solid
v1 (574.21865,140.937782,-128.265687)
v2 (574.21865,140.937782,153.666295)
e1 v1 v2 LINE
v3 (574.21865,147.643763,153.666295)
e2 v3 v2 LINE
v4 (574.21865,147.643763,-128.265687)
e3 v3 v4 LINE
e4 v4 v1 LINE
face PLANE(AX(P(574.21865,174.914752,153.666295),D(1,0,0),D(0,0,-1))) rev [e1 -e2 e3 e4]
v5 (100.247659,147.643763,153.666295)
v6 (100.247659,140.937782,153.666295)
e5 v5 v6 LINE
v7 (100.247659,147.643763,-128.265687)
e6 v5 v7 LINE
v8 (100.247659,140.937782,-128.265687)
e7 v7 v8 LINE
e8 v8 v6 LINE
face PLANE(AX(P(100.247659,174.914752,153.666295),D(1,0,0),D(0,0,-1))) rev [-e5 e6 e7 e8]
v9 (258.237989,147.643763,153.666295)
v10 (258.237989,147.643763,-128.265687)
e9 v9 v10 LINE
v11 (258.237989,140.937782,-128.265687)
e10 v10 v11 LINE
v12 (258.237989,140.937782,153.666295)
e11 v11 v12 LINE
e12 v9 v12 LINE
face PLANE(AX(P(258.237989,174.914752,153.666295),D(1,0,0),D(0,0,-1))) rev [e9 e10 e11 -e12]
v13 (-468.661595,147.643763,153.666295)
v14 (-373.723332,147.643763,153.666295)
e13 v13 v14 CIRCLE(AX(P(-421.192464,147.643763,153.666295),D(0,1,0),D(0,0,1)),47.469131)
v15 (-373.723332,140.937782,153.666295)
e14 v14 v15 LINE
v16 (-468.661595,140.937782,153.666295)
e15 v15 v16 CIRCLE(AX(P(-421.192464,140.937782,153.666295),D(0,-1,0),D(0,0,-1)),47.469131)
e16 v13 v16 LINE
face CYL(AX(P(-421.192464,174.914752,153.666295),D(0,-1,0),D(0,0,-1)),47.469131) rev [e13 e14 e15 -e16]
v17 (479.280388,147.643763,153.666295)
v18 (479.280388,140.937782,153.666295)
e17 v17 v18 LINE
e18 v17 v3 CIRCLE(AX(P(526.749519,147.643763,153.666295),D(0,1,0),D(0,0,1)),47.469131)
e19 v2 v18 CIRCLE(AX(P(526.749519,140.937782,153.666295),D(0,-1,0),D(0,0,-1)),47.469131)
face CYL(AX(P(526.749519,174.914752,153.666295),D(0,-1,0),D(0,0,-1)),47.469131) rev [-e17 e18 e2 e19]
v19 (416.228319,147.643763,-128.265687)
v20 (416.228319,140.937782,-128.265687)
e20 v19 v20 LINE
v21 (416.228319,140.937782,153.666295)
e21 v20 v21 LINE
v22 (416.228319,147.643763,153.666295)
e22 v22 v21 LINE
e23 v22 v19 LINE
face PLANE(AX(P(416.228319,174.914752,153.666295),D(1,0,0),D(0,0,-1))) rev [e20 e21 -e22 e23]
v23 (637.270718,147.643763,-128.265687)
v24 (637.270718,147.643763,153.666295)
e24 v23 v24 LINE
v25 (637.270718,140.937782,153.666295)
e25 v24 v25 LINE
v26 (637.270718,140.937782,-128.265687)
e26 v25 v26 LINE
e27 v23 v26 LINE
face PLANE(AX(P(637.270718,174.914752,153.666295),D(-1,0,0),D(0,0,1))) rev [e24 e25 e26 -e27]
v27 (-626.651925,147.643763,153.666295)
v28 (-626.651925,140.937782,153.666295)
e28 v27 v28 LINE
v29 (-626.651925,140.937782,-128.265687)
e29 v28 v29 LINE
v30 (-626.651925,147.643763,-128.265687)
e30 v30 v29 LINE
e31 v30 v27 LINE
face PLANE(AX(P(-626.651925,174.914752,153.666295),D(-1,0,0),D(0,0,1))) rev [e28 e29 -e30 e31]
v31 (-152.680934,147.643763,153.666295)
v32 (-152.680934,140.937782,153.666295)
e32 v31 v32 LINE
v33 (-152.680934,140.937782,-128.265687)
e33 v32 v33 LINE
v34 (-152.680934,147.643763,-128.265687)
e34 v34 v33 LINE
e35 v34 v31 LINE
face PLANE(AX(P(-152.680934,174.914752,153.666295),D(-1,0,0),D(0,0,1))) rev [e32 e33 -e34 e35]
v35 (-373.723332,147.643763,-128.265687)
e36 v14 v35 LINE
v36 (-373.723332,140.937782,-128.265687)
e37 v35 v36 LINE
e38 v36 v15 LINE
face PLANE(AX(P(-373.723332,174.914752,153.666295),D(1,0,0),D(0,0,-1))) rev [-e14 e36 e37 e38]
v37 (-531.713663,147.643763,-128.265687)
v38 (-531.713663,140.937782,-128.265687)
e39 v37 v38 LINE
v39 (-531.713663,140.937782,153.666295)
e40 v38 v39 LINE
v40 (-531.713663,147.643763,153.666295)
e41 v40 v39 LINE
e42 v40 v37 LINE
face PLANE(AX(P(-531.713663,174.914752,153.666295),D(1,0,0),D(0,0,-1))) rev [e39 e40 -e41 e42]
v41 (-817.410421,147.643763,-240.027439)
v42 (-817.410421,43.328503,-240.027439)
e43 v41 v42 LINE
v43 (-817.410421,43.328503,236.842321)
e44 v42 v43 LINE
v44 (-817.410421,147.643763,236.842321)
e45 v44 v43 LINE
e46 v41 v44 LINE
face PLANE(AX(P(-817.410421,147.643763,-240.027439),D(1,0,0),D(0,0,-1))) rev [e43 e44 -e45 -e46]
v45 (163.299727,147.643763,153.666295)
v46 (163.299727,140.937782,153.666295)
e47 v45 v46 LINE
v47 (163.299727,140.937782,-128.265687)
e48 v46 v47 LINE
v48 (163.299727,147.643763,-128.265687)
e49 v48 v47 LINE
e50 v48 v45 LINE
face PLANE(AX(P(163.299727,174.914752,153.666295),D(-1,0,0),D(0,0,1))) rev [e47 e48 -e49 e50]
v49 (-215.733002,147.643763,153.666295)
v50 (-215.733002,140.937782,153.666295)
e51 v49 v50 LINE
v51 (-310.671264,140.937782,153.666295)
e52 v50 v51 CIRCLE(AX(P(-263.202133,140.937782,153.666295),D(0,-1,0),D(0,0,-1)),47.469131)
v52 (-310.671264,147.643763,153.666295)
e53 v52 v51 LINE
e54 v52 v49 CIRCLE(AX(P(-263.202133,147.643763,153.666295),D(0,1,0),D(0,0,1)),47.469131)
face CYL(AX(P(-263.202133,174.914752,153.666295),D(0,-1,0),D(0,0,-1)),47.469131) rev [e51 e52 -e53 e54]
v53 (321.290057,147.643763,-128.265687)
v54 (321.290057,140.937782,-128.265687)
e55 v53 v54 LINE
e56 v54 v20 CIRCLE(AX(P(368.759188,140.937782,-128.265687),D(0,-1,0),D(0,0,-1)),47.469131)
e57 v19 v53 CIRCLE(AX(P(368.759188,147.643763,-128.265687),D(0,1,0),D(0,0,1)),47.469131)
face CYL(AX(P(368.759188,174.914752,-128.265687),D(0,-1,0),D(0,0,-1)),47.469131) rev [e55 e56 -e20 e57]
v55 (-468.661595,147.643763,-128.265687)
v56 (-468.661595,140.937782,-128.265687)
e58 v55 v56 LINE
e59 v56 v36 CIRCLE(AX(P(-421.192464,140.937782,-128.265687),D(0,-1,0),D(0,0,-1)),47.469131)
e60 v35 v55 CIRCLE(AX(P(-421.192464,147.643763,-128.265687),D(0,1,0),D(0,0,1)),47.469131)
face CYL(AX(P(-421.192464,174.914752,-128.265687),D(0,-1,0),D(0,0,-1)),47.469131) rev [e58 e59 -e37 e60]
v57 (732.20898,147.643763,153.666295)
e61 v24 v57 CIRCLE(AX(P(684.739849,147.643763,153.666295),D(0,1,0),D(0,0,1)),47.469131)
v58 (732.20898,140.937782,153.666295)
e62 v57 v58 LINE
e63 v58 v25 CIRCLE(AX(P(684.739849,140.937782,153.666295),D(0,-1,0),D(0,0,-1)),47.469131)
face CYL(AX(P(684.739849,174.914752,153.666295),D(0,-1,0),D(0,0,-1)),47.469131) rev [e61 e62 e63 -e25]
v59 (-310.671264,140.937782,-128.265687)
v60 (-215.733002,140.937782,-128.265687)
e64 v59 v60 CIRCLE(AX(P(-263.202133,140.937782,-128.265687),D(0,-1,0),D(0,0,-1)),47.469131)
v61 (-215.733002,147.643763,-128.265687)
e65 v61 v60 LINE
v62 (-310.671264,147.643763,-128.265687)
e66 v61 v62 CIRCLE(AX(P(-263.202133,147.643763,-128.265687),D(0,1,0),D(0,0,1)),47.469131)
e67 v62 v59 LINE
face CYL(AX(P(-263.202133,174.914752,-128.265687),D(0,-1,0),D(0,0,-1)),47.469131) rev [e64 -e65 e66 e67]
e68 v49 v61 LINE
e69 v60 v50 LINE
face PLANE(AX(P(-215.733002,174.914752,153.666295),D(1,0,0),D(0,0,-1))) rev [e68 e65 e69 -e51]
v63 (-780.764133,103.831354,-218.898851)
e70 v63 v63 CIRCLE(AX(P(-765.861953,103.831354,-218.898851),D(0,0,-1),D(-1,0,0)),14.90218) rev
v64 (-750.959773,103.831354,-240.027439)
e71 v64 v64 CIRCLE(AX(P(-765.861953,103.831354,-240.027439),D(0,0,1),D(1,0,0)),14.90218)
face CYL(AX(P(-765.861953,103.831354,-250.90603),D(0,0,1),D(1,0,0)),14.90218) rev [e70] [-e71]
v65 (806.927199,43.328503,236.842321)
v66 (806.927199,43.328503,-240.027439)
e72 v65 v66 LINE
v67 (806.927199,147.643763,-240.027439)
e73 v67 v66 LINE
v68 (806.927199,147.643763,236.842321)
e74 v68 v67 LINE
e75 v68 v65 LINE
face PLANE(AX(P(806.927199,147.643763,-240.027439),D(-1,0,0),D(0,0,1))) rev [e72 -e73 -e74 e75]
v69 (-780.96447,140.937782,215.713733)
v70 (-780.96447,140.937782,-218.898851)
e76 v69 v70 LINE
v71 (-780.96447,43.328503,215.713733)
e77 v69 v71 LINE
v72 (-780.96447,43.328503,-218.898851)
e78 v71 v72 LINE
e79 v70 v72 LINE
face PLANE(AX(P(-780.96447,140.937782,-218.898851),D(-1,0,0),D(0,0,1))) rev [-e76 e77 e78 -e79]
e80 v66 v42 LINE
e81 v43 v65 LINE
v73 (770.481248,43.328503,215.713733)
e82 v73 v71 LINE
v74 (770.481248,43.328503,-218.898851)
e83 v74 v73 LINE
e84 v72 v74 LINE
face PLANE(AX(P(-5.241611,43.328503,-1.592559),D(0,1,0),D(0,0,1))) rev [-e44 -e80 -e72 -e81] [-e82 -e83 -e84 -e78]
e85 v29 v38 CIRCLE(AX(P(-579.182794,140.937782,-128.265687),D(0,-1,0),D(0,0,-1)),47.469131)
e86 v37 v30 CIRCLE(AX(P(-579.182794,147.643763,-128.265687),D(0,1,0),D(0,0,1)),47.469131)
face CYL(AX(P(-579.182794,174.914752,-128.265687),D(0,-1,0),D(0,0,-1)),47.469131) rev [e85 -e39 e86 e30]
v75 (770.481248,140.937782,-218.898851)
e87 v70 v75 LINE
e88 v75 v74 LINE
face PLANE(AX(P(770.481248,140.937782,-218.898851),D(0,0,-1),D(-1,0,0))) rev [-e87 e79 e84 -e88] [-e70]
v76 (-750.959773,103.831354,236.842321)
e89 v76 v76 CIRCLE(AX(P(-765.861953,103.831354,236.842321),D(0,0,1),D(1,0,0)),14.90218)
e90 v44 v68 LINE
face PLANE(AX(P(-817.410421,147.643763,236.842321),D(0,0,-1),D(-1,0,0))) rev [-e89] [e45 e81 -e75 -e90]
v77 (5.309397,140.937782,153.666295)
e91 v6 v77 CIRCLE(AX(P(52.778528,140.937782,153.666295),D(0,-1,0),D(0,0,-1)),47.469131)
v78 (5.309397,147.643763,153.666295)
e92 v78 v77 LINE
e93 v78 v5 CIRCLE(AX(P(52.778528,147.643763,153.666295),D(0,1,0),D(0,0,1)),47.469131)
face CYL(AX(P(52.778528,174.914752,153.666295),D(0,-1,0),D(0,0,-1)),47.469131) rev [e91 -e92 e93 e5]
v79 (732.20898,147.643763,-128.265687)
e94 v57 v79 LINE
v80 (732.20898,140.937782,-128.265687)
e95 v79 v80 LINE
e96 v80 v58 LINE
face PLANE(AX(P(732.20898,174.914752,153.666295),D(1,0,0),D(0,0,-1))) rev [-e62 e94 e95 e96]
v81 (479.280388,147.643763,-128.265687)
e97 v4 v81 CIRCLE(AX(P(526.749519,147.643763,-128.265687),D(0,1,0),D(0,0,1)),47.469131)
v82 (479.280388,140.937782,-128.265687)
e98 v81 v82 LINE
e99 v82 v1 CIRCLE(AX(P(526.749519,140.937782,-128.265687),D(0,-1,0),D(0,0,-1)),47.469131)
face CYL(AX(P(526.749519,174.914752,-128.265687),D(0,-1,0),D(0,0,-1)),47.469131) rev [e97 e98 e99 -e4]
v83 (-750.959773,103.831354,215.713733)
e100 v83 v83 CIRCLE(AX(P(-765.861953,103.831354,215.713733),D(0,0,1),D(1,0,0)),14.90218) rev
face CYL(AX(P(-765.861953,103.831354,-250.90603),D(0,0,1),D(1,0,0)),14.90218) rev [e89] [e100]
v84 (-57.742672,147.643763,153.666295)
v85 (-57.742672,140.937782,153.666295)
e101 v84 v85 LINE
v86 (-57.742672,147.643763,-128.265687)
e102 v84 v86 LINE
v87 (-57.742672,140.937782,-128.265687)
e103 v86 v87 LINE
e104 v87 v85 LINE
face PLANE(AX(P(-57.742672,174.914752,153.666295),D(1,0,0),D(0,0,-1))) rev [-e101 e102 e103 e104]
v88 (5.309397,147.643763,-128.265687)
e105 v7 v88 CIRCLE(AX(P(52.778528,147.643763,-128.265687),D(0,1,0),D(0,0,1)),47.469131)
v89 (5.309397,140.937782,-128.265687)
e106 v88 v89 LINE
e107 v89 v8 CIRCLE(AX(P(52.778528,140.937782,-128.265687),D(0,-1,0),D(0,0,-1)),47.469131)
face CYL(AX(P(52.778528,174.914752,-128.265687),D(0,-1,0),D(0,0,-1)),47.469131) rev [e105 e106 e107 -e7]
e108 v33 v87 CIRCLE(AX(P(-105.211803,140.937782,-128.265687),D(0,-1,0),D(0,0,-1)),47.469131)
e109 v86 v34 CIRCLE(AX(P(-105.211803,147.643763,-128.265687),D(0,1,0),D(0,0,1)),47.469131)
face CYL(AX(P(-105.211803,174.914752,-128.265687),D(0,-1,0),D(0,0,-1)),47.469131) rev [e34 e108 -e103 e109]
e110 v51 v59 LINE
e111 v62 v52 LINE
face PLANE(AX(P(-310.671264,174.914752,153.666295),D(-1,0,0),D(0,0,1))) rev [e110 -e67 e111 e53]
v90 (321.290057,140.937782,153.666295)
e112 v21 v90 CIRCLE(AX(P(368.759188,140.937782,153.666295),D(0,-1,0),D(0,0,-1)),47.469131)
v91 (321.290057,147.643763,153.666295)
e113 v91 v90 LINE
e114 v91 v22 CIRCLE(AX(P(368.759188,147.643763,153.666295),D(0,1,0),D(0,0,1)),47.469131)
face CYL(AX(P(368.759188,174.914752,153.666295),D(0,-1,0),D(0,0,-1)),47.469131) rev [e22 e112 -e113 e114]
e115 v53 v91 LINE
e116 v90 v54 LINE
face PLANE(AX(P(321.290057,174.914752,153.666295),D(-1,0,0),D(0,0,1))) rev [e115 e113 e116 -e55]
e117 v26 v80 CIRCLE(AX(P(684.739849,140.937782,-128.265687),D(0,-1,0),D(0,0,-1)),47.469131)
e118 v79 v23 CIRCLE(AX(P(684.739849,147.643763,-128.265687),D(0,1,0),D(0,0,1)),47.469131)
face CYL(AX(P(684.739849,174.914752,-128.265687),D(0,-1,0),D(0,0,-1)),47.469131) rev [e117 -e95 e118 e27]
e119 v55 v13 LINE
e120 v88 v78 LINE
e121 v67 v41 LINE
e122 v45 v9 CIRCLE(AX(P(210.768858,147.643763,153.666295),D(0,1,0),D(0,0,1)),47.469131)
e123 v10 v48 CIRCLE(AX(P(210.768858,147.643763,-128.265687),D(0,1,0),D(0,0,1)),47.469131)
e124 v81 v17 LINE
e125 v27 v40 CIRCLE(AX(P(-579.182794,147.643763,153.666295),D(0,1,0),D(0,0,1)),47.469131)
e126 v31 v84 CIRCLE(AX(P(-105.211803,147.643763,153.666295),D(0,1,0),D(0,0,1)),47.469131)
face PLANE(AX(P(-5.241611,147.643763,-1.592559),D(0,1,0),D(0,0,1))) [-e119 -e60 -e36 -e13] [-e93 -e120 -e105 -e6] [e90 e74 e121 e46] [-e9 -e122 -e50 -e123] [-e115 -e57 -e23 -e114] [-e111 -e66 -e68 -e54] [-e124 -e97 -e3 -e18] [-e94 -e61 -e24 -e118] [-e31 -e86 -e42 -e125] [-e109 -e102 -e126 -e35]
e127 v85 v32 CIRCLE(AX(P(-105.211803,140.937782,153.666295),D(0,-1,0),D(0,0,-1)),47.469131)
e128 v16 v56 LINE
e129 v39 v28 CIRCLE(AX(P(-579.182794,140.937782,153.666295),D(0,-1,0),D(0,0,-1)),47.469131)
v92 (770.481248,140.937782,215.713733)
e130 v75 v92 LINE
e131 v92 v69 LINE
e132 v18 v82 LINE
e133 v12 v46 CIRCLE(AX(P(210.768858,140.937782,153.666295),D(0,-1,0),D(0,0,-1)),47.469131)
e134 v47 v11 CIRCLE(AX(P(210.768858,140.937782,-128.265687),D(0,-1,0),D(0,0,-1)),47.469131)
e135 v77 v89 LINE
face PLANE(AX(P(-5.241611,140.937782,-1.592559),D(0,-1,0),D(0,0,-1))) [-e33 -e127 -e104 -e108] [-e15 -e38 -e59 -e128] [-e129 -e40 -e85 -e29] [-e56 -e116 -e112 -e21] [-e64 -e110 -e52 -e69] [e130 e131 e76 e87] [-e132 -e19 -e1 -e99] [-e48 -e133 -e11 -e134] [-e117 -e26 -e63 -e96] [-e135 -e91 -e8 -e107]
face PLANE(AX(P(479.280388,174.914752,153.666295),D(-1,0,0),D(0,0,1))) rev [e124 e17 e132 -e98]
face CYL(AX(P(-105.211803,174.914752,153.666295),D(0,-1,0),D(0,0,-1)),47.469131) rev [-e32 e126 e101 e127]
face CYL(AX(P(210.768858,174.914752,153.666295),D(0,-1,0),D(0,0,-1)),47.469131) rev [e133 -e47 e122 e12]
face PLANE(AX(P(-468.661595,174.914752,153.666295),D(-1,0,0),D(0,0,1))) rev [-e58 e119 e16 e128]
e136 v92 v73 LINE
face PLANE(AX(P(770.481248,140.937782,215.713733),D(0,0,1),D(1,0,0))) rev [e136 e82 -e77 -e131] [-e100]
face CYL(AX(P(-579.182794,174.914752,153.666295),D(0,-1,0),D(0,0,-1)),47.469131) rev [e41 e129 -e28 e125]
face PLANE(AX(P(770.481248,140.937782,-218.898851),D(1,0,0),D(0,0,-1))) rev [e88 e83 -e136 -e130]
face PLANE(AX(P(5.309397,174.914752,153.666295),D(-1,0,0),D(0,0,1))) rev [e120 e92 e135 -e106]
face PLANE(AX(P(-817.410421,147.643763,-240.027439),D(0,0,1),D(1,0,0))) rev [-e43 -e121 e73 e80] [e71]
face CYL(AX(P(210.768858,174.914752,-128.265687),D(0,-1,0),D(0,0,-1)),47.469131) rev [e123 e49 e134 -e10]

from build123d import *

# Parameters (mm, degrees)
SKETCH1_W           = 2768.6
SKETCH1_H           = 812.8
BOSS_EXTRUDE1_DEPTH = 177.8
SKETCH2_R           = 25.4
CUT_EXTRUDE1_DEPTH  = 831.342
SKETCH3_W           = 2644.359498688
SKETCH3_H           = 740.774814922
CUT_EXTRUDE2_DEPTH  = 166.37
CUT_EXTRUDE3_DEPTH  = 57.912
FILL_START          = 166.37
FILL_PATTERN1_DEPTH = 11.43
SCALE1_SCALE        = 0.5867


# Read off the part's stored shape, not the designer's step: Fill Pattern1
with BuildPart() as part:
    # Sketch1 → Boss-Extrude1 (new body)
    with BuildSketch(Plane(origin=(0, 0, 0), x_dir=(1, 0, 0), z_dir=(0, 1, 0))):
        Rectangle(SKETCH1_W, SKETCH1_H)
    extrude(amount=BOSS_EXTRUDE1_DEPTH)

    # Sketch2 → Cut-Extrude1 (cut)
    with BuildSketch(Plane.XY.offset(406.4)):
        with Locations((-1296.438284971, 103.124)):
            Circle(SKETCH2_R)
    extrude(amount=-CUT_EXTRUDE1_DEPTH, mode=Mode.SUBTRACT)

    # Sketch3 → Cut-Extrude2 (cut)
    with BuildSketch(Plane.XZ):
        Rectangle(SKETCH3_W, SKETCH3_H)
    extrude(amount=-CUT_EXTRUDE2_DEPTH, mode=Mode.SUBTRACT)

    # Sketch12 → Cut-Extrude3 (cut)
    with BuildSketch(Plane.XZ.offset(-166.37)):
        with BuildLine():
            Line((-897.344557037, 264.630737371), (-897.344557037, -215.907837093))
            ThreePointArc((-897.344557037, -215.907837093), (-978.253251545, -296.816531601), (-1059.161946053, -215.907837093))
            Line((-1059.161946053, -215.907837093), (-1059.161946053, 264.630737371))
            ThreePointArc((-1059.161946053, 264.630737371), (-978.253251545, 345.539431879), (-897.344557037, 264.630737371))
        make_face()
    extrude(amount=-CUT_EXTRUDE3_DEPTH, mode=Mode.SUBTRACT)

    # Fill Pattern1 outline → Fill Pattern1 (cut)
    with BuildSketch(Plane(origin=(0, 0, 0), x_dir=(1, 0, 0), z_dir=(0, 1, 0)).offset(FILL_START)):
        with BuildLine():
            ThreePointArc((-789.87554691, -264.630737371), (-708.966852402, -345.539431879), (-628.058157894, -264.630737371))
            Line((-628.058157894, -264.630737371), (-628.058157894, 215.907837093))
            ThreePointArc((-628.058157894, 215.907837093), (-708.966852402, 296.816531601), (-789.87554691, 215.907837093))
            Line((-789.87554691, 215.907837093), (-789.87554691, -264.630737371))
        make_face()
        with BuildLine():
            ThreePointArc((1095.129247093, -264.630737371), (1176.0379416, -345.539431879), (1256.946636108, -264.630737371))
            Line((1256.946636108, -264.630737371), (1256.946636108, 215.907837093))
            ThreePointArc((1256.946636108, 215.907837093), (1176.0379416, 296.816531601), (1095.129247093, 215.907837093))
            Line((1095.129247093, 215.907837093), (1095.129247093, -264.630737371))
        make_face()
        with BuildLine():
            ThreePointArc((825.842847949, -264.630737371), (906.751542457, -345.539431879), (987.660236965, -264.630737371))
            Line((987.660236965, -264.630737371), (987.660236965, 215.907837093))
            ThreePointArc((987.660236965, 215.907837093), (906.751542457, 296.816531601), (825.842847949, 215.907837093))
            Line((825.842847949, 215.907837093), (825.842847949, -264.630737371))
        make_face()
        with BuildLine():
            ThreePointArc((556.556448806, -264.630737371), (637.465143314, -345.539431879), (718.373837822, -264.630737371))
            Line((718.373837822, -264.630737371), (718.373837822, 215.907837093))
            ThreePointArc((718.373837822, 215.907837093), (637.465143314, 296.816531601), (556.556448806, 215.907837093))
            Line((556.556448806, 215.907837093), (556.556448806, -264.630737371))
        make_face()
        with BuildLine():
            ThreePointArc((287.270049663, -264.630737371), (368.178744171, -345.539431879), (449.087438678, -264.630737371))
            Line((449.087438678, -264.630737371), (449.087438678, 215.907837093))
            ThreePointArc((449.087438678, 215.907837093), (368.178744171, 296.816531601), (287.270049663, 215.907837093))
            Line((287.270049663, 215.907837093), (287.270049663, -264.630737371))
        make_face()
        with BuildLine():
            ThreePointArc((17.98365052, -264.630737371), (98.892345027, -345.539431879), (179.801039535, -264.630737371))
            Line((179.801039535, -264.630737371), (179.801039535, 215.907837093))
            ThreePointArc((179.801039535, 215.907837093), (98.892345027, 296.816531601), (17.98365052, 215.907837093))
            Line((17.98365052, 215.907837093), (17.98365052, -264.630737371))
        make_face()
        with BuildLine():
            ThreePointArc((-251.302748623, -264.630737371), (-170.394054116, -345.539431879), (-89.485359608, -264.630737371))
            Line((-89.485359608, -264.630737371), (-89.485359608, 215.907837093))
            ThreePointArc((-89.485359608, 215.907837093), (-170.394054116, 296.816531601), (-251.302748623, 215.907837093))
            Line((-251.302748623, 215.907837093), (-251.302748623, -264.630737371))
        make_face()
        with BuildLine():
            ThreePointArc((-520.589147766, -264.630737371), (-439.680453258, -345.539431879), (-358.771758751, -264.630737371))
            Line((-358.771758751, -264.630737371), (-358.771758751, 215.907837093))
            ThreePointArc((-358.771758751, 215.907837093), (-439.680453258, 296.816531601), (-520.589147766, 215.907837093))
            Line((-520.589147766, 215.907837093), (-520.589147766, -264.630737371))
        make_face()
    extrude(amount=FILL_PATTERN1_DEPTH, mode=Mode.SUBTRACT)


with BuildPart() as part_1:
    # Scale1: scaled about (-12.682340198, 104.835478071, -3.853275395)
    add(part.part.scale(SCALE1_SCALE).moved(Location((-5.241611204, 43.328503087, -1.592558721))))


solid = part_1.part
